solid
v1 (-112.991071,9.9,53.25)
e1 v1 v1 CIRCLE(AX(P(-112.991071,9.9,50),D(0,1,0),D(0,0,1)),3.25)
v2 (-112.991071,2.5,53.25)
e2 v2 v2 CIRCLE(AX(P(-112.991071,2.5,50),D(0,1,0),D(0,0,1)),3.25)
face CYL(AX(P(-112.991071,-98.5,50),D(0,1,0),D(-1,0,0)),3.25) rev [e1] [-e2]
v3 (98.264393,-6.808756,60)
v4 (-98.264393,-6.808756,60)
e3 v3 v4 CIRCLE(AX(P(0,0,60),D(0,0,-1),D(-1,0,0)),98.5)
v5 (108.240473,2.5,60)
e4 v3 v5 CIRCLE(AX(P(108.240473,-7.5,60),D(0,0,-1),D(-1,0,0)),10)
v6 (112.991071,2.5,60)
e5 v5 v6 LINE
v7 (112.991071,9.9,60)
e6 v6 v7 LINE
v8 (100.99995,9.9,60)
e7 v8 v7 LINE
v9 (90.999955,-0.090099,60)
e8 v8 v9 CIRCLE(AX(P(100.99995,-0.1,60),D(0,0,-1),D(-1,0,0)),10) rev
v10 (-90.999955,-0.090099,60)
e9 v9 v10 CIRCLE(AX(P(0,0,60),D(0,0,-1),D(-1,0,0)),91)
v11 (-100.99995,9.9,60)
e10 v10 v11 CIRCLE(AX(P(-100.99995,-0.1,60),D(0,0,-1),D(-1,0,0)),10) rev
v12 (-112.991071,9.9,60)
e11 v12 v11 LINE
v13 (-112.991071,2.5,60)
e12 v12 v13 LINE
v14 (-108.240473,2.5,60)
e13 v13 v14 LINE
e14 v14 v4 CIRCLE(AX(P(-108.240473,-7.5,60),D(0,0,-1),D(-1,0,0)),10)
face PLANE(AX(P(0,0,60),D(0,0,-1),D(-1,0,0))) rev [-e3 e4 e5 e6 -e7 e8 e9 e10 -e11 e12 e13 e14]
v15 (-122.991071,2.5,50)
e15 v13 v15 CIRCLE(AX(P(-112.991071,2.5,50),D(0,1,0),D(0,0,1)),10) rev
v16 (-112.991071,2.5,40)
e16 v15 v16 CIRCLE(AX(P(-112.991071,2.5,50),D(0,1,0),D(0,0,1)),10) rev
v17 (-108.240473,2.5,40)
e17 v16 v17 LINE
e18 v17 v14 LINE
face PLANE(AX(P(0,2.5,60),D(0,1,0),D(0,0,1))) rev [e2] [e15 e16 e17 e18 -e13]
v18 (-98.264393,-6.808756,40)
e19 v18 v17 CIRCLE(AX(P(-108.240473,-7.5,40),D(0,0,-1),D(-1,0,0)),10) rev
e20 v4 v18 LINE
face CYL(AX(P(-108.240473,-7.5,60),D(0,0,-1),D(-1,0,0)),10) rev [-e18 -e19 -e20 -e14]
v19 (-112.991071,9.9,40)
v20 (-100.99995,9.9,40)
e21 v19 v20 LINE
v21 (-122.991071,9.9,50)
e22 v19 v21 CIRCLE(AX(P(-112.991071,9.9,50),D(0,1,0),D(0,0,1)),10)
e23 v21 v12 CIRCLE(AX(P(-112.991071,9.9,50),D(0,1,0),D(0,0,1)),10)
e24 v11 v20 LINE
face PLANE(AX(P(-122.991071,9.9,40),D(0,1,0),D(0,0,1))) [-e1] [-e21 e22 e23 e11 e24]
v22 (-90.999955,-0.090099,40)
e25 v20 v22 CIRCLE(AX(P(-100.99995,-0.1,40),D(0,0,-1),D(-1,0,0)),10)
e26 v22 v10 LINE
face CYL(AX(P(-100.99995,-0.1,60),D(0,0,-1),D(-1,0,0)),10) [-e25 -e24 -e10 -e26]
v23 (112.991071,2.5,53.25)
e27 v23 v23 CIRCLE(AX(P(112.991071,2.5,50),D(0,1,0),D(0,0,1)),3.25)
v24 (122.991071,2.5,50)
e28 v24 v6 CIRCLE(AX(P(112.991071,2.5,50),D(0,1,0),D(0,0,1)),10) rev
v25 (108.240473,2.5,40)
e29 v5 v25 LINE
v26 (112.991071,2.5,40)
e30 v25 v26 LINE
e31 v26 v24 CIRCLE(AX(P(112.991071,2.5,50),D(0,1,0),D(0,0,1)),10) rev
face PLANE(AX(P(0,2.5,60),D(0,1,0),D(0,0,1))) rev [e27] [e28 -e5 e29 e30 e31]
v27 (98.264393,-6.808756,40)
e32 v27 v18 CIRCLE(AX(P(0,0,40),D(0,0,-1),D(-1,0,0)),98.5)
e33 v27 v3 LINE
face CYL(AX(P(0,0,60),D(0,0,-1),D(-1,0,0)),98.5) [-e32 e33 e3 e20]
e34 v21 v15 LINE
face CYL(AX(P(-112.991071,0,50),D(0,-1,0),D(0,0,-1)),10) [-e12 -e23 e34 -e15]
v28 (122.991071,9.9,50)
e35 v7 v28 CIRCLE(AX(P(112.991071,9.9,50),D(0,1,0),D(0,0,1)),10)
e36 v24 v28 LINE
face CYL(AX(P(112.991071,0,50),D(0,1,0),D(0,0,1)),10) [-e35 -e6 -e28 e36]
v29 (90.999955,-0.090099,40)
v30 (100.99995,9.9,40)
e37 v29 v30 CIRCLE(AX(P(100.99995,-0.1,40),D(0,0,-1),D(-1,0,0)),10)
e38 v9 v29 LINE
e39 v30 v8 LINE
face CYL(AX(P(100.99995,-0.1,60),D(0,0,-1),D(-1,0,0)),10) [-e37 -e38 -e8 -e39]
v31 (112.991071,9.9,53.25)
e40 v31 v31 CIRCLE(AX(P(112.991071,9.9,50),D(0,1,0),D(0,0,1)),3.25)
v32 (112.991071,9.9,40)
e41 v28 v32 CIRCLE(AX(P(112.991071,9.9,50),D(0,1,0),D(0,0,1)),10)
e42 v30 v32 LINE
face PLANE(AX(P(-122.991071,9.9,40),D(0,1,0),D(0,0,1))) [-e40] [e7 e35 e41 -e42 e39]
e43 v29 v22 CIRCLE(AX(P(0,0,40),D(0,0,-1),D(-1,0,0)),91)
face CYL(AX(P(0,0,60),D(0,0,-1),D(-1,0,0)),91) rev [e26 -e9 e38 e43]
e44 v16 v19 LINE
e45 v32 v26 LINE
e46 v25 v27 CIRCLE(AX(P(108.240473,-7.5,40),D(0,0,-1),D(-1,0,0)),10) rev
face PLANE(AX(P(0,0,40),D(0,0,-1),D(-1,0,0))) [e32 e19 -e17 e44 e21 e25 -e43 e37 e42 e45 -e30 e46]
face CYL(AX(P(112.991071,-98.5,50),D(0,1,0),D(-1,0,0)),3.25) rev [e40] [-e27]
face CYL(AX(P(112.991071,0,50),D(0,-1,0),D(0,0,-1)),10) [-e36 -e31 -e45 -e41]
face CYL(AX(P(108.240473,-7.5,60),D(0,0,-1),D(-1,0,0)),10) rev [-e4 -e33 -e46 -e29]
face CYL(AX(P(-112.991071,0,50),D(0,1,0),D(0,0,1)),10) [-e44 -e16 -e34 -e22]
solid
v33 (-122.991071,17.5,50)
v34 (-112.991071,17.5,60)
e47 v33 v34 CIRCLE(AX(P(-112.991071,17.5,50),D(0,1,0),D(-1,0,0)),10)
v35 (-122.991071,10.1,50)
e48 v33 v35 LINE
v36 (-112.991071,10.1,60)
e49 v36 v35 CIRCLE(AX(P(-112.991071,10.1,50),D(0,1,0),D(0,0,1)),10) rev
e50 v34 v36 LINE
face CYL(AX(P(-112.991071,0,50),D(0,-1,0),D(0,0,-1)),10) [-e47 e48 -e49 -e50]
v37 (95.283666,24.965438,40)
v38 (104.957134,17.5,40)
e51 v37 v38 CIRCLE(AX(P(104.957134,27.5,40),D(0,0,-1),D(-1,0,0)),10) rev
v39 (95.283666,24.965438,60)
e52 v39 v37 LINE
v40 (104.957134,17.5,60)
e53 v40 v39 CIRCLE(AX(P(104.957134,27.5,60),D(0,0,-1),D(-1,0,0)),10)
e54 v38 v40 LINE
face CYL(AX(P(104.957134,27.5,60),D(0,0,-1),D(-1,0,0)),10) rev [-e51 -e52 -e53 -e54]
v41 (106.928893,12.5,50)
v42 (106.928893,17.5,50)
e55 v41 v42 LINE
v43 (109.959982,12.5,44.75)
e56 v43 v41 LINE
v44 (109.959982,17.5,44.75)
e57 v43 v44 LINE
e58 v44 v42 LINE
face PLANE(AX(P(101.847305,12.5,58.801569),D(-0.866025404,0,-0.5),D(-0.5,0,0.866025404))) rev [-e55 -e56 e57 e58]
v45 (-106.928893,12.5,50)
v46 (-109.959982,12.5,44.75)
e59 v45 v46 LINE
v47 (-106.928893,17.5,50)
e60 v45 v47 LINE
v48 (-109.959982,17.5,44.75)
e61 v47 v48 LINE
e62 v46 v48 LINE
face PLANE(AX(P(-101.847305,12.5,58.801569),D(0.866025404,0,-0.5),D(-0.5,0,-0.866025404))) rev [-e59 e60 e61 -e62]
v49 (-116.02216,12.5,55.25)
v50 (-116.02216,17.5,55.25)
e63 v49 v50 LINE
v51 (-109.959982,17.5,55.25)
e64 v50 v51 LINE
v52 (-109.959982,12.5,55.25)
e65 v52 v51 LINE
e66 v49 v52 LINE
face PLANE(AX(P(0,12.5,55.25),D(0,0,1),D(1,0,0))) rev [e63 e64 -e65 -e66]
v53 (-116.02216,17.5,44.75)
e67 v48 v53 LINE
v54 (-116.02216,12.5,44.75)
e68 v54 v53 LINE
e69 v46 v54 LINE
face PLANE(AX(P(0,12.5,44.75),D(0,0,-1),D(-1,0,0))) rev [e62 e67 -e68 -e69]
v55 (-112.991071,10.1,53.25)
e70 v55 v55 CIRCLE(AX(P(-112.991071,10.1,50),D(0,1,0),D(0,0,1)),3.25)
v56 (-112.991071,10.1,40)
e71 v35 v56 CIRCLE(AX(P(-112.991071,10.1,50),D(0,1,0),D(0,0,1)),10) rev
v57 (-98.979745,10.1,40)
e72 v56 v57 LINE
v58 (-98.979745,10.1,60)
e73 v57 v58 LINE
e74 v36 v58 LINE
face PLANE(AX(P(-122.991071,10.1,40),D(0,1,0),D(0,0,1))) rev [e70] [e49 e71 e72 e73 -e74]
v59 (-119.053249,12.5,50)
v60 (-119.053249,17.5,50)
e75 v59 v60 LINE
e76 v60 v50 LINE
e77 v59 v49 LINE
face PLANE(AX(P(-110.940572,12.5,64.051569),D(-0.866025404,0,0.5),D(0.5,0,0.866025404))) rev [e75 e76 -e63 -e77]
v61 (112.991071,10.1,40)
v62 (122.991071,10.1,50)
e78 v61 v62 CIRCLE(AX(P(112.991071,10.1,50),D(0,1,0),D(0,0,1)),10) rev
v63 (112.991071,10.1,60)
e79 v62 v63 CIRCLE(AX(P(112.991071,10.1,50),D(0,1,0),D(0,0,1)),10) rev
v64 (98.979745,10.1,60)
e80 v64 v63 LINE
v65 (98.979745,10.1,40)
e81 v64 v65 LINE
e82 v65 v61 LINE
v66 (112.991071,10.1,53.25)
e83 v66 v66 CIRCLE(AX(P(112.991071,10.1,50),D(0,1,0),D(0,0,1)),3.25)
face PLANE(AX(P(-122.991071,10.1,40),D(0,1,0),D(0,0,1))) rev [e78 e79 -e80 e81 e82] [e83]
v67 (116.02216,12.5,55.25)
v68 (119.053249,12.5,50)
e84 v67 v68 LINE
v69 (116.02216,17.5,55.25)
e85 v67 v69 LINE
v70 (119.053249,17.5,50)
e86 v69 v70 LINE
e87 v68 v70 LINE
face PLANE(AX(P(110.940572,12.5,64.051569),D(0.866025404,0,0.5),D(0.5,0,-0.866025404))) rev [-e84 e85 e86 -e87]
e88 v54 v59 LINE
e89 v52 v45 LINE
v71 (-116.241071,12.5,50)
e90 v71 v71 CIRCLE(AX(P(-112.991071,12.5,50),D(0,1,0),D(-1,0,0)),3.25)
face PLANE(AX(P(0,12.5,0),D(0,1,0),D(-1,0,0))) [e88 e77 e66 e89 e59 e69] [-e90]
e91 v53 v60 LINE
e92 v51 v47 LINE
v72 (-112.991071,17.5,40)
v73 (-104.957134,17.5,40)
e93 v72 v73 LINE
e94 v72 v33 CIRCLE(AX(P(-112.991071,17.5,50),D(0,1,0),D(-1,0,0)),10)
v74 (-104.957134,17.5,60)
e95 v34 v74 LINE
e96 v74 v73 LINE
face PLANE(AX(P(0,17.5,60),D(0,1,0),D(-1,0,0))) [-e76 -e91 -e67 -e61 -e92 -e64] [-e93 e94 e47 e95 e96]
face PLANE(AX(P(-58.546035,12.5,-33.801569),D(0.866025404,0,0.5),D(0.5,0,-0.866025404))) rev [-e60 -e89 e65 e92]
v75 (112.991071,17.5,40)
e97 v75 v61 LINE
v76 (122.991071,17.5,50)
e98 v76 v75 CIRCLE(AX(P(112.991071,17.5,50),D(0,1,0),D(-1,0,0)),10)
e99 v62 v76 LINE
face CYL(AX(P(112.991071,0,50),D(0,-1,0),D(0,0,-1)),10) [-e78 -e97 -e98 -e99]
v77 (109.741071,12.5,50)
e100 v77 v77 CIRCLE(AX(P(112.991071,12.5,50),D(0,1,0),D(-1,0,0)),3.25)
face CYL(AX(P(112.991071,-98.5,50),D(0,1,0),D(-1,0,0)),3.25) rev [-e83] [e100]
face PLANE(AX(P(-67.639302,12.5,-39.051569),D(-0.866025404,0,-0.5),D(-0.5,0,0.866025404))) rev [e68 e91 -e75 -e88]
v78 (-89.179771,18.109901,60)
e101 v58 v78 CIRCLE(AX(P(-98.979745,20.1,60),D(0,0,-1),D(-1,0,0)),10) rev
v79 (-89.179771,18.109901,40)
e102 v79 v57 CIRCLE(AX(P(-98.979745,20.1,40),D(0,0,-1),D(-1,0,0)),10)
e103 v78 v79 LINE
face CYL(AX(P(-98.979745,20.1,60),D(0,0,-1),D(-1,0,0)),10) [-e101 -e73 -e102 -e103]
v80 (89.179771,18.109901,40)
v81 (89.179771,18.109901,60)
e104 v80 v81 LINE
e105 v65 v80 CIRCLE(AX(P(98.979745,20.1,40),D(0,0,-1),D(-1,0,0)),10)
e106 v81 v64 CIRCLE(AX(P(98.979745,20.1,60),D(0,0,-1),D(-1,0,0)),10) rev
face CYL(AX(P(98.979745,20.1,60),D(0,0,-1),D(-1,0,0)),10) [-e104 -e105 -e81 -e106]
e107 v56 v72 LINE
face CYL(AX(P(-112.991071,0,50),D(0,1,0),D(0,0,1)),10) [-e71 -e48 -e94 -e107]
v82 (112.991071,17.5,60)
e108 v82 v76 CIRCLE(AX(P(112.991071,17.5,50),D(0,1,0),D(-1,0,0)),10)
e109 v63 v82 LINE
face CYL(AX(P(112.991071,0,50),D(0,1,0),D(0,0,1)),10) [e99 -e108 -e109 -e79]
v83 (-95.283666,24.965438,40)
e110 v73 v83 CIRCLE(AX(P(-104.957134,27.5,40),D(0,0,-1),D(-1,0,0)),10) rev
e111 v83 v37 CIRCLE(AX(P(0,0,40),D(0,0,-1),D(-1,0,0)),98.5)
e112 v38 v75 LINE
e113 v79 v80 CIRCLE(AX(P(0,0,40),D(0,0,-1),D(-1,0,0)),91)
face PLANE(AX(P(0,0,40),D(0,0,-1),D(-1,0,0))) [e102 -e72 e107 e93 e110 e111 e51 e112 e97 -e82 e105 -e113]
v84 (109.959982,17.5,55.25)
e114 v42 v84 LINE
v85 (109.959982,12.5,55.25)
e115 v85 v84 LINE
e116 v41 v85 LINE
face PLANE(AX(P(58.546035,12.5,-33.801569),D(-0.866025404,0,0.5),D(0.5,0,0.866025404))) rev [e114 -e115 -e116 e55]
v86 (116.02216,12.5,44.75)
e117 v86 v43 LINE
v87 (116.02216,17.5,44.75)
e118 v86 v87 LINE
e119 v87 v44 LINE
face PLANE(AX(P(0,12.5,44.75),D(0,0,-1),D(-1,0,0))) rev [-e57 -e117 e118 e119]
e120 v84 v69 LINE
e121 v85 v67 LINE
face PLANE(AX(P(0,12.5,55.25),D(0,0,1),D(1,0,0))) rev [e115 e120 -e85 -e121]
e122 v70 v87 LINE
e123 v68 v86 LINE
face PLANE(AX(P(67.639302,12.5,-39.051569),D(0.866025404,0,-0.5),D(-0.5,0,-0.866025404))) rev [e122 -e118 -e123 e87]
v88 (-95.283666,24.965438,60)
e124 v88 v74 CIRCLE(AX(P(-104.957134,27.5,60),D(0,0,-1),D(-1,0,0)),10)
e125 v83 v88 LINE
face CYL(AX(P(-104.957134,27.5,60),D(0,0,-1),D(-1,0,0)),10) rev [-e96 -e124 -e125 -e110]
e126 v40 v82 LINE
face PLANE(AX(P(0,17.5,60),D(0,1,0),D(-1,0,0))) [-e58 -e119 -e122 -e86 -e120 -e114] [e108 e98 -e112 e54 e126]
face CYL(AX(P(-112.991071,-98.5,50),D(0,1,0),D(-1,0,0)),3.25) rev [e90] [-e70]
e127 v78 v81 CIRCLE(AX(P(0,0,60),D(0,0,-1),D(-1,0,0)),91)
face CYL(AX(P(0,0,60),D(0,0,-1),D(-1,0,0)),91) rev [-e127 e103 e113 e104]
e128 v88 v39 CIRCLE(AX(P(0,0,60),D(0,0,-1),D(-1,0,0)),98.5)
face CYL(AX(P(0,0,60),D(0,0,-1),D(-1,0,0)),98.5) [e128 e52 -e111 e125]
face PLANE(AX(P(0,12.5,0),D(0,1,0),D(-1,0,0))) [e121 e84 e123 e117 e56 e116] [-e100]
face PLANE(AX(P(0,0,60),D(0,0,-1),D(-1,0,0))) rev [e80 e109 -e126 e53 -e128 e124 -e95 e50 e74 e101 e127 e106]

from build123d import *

# Parameters (mm, degrees)
BOSS_EXTRUDE1_DEPTH     = 20
CUT_EXTRUDE1_DEPTH      = 272.678972695
CUT_EXTRUDE1_DEPTH_BACK = 272.678972695
SKETCH3_W               = 20
SKETCH3_H               = 0.2
FILLET1_R               = 10
FILLET2_R               = 10
FILLET3_R               = 10
FILLET4_R               = 10
CUT_EXTRUDE2_DEPTH      = 5
SKETCH5_R               = 3.25
CUT_EXTRUDE3_DEPTH      = 177.203869452


with BuildPart() as part:
    # Sketch2 → Boss-Extrude1 (new body)
    with BuildSketch(Plane(origin=(0, 0, 40), x_dir=(-1, 0, 0), z_dir=(0, 0, -1))):
        with BuildLine():
            Line((97.991071022, 10), (122.991071022, 10))
            Line((122.991071022, 10), (122.991071022, 17.5))
            Line((122.991071022, 17.5), (96.932966528, 17.5))
            ThreePointArc((96.932966528, 17.5), (97.534135582, 13.760174282), (97.991071022, 10))
        make_face()
        with BuildLine():
            Line((90.44888059, 10), (97.991071022, 10))
            ThreePointArc((97.991071022, 10), (97.534135582, 13.760174282), (96.932966528, 17.5))
            Line((96.932966528, 17.5), (89.301455755, 17.5))
            ThreePointArc((89.301455755, 17.5), (89.953367664, 13.761963738), (90.44888059, 10))
        make_face()
        with BuildLine():
            Line((89.301455755, 17.5), (96.932966528, 17.5))
            ThreePointArc((96.932966528, 17.5), (0, 98.5), (-96.932966528, 17.5))
            Line((-96.932966528, 17.5), (-89.301455755, 17.5))
            ThreePointArc((-89.301455755, 17.5), (0, 91), (89.301455755, 17.5))
        make_face()
        with BuildLine():
            Line((90.965652859, 2.5), (98.468269001, 2.5))
            ThreePointArc((98.468269001, 2.5), (98.301223647, 6.2545527), (97.991071022, 10))
            Line((97.991071022, 10), (90.44888059, 10))
            ThreePointArc((90.44888059, 10), (90.784749472, 6.255338791), (90.965652859, 2.5))
        make_face()
        with BuildLine():
            Line((98.468269001, 2.5), (122.991071022, 2.5))
            Line((122.991071022, 2.5), (122.991071022, 10))
            Line((122.991071022, 10), (97.991071022, 10))
            ThreePointArc((97.991071022, 10), (98.301223647, 6.2545527), (98.468269001, 2.5))
        make_face()
        with BuildLine():
            ThreePointArc((98.5, 0), (98.492066931, 1.250100682), (98.468269001, 2.5))
            Line((98.468269001, 2.5), (90.965652859, 2.5))
            ThreePointArc((90.965652859, 2.5), (90.991412809, 1.250117967), (91, 0))
            ThreePointArc((91, 0), (-1.250117967, -90.991412809), (-90.965652859, 2.5))
            Line((-90.965652859, 2.5), (-98.468269001, 2.5))
            ThreePointArc((-98.468269001, 2.5), (-1.250100682, -98.492066931), (98.5, 0))
        make_face()
        with BuildLine():
            Line((-98.468269001, 2.5), (-90.965652859, 2.5))
            ThreePointArc((-90.965652859, 2.5), (-90.784749472, 6.255338791), (-90.44888059, 10))
            Line((-90.44888059, 10), (-97.991071022, 10))
            ThreePointArc((-97.991071022, 10), (-98.301223647, 6.2545527), (-98.468269001, 2.5))
        make_face()
        with BuildLine():
            Line((-97.991071022, 10), (-90.44888059, 10))
            ThreePointArc((-90.44888059, 10), (-89.953367664, 13.761963738), (-89.301455755, 17.5))
            Line((-89.301455755, 17.5), (-96.932966528, 17.5))
            ThreePointArc((-96.932966528, 17.5), (-97.534135582, 13.760174282), (-97.991071022, 10))
        make_face()
        with BuildLine():
            Line((-122.991071022, 10), (-97.991071022, 10))
            ThreePointArc((-97.991071022, 10), (-97.534135582, 13.760174282), (-96.932966528, 17.5))
            Line((-96.932966528, 17.5), (-122.991071022, 17.5))
            Line((-122.991071022, 17.5), (-122.991071022, 10))
        make_face()
        with BuildLine():
            Line((-122.991071022, 2.5), (-98.468269001, 2.5))
            ThreePointArc((-98.468269001, 2.5), (-98.301223647, 6.2545527), (-97.991071022, 10))
            Line((-97.991071022, 10), (-122.991071022, 10))
            Line((-122.991071022, 10), (-122.991071022, 2.5))
        make_face()
    extrude(amount=-BOSS_EXTRUDE1_DEPTH)

    # Sketch3 → Cut-Extrude1 (cut, two sides: drawn at the far end of the back side and taken through both)
    with BuildSketch(Plane(origin=(122.991071022, 0, 0), x_dir=(0, 0, -1), z_dir=(1, 0, 0)).offset(-CUT_EXTRUDE1_DEPTH_BACK)):
        with Locations((-50, 10)):
            Rectangle(SKETCH3_W, SKETCH3_H)
    extrude(amount=CUT_EXTRUDE1_DEPTH + CUT_EXTRUDE1_DEPTH_BACK, mode=Mode.SUBTRACT)


with BuildPart() as cut_extrude1_piece_1:
    # of the separate pieces the step leaves, piece 1, a body of its own (cut_extrude1_pieces)
    add(part.part.solids().sort_by_distance((-122.991071022, 2.5, 40))[0])

    # Fillet2
    fillet2_edges = [cut_extrude1_piece_1.edges().sort_by_distance(p)[0] for p in [
        (-98.468269001, 2.5, 50),
        (98.468269001, 2.5, 50),
        (90.45988061, 9.9, 50),
        (-90.45988061, 9.9, 50),
    ]]
    fillet(fillet2_edges, radius=FILLET2_R)

    # Fillet3
    fillet3_edges = [cut_extrude1_piece_1.edges().sort_by_distance(p)[0] for p in [
        (122.991071022, 6.2, 60),
        (-122.991071022, 6.2, 40),
        (-122.991071022, 6.2, 60),
        (122.991071022, 6.2, 40),
    ]]
    fillet(fillet3_edges, radius=FILLET3_R - 0.0001)  # a hair under: the kernel refuses the full size


with BuildPart() as cut_extrude1_piece_2:
    # of the separate pieces the step leaves, piece 2, a body of its own (cut_extrude1_pieces)
    add(part.part.solids().sort_by_distance((-122.991071022, 10.1, 40))[0])

    # Fillet1
    fillet1_edges = [cut_extrude1_piece_2.edges().sort_by_distance(p)[0] for p in [
        (96.932966528, 17.5, 50),
        (-96.932966528, 17.5, 50),
        (90.437768659, 10.1, 50),
        (-90.437768659, 10.1, 50),
    ]]
    fillet(fillet1_edges, radius=FILLET1_R)

    # Fillet4
    fillet4_edges = [cut_extrude1_piece_2.edges().sort_by_distance(p)[0] for p in [
        (-122.991071022, 13.8, 60),
        (-122.991071022, 13.8, 40),
        (122.991071022, 13.8, 60),
        (122.991071022, 13.8, 40),
    ]]
    fillet(fillet4_edges, radius=FILLET4_R - 0.0001)  # a hair under: the kernel refuses the full size

    # Sketch4 → Cut-Extrude2 (cut)
    with BuildSketch(Plane(origin=(0, 17.5, 0), x_dir=(1, 0, 0), z_dir=(0, 1, 0))):
        Polygon((109.959982109, -55.25), (116.022159935, -55.25), (119.053248848, -50), (116.022159935, -44.75), (109.959982109, -44.75), (106.928893195, -50), align=None)
        Polygon((-106.928893195, -50), (-109.959982109, -44.75), (-116.022159935, -44.75), (-119.053248848, -50), (-116.022159935, -55.25), (-109.959982109, -55.25), align=None)
    extrude(amount=-CUT_EXTRUDE2_DEPTH, mode=Mode.SUBTRACT)


with BuildPart() as cut_extrude3_tool:
    # Sketch5 → Cut-Extrude3 (new, through all)
    with BuildSketch(Plane(origin=(0, 12.5, 0), x_dir=(1, 0, 0), z_dir=(0, 1, 0))):
        with Locations(Location((-112.991071022, -50, 0), (0, 0, 270))):
            Circle(SKETCH5_R)
        with Locations(Location((112.991071022, -50, 0), (0, 0, 270))):
            Circle(SKETCH5_R)
    extrude(amount=-CUT_EXTRUDE3_DEPTH)


with BuildPart() as cut_extrude1_piece_1_1:
    add(cut_extrude1_piece_1.part)

    # Cut-Extrude3: cut by cut_extrude3_tool
    add(cut_extrude3_tool.part, mode=Mode.SUBTRACT)


with BuildPart() as cut_extrude1_piece_2_1:
    add(cut_extrude1_piece_2.part)

    # Cut-Extrude3: cut by cut_extrude3_tool
    add(cut_extrude3_tool.part, mode=Mode.SUBTRACT)


solid = Compound([cut_extrude1_piece_1_1.part, cut_extrude1_piece_2_1.part])
